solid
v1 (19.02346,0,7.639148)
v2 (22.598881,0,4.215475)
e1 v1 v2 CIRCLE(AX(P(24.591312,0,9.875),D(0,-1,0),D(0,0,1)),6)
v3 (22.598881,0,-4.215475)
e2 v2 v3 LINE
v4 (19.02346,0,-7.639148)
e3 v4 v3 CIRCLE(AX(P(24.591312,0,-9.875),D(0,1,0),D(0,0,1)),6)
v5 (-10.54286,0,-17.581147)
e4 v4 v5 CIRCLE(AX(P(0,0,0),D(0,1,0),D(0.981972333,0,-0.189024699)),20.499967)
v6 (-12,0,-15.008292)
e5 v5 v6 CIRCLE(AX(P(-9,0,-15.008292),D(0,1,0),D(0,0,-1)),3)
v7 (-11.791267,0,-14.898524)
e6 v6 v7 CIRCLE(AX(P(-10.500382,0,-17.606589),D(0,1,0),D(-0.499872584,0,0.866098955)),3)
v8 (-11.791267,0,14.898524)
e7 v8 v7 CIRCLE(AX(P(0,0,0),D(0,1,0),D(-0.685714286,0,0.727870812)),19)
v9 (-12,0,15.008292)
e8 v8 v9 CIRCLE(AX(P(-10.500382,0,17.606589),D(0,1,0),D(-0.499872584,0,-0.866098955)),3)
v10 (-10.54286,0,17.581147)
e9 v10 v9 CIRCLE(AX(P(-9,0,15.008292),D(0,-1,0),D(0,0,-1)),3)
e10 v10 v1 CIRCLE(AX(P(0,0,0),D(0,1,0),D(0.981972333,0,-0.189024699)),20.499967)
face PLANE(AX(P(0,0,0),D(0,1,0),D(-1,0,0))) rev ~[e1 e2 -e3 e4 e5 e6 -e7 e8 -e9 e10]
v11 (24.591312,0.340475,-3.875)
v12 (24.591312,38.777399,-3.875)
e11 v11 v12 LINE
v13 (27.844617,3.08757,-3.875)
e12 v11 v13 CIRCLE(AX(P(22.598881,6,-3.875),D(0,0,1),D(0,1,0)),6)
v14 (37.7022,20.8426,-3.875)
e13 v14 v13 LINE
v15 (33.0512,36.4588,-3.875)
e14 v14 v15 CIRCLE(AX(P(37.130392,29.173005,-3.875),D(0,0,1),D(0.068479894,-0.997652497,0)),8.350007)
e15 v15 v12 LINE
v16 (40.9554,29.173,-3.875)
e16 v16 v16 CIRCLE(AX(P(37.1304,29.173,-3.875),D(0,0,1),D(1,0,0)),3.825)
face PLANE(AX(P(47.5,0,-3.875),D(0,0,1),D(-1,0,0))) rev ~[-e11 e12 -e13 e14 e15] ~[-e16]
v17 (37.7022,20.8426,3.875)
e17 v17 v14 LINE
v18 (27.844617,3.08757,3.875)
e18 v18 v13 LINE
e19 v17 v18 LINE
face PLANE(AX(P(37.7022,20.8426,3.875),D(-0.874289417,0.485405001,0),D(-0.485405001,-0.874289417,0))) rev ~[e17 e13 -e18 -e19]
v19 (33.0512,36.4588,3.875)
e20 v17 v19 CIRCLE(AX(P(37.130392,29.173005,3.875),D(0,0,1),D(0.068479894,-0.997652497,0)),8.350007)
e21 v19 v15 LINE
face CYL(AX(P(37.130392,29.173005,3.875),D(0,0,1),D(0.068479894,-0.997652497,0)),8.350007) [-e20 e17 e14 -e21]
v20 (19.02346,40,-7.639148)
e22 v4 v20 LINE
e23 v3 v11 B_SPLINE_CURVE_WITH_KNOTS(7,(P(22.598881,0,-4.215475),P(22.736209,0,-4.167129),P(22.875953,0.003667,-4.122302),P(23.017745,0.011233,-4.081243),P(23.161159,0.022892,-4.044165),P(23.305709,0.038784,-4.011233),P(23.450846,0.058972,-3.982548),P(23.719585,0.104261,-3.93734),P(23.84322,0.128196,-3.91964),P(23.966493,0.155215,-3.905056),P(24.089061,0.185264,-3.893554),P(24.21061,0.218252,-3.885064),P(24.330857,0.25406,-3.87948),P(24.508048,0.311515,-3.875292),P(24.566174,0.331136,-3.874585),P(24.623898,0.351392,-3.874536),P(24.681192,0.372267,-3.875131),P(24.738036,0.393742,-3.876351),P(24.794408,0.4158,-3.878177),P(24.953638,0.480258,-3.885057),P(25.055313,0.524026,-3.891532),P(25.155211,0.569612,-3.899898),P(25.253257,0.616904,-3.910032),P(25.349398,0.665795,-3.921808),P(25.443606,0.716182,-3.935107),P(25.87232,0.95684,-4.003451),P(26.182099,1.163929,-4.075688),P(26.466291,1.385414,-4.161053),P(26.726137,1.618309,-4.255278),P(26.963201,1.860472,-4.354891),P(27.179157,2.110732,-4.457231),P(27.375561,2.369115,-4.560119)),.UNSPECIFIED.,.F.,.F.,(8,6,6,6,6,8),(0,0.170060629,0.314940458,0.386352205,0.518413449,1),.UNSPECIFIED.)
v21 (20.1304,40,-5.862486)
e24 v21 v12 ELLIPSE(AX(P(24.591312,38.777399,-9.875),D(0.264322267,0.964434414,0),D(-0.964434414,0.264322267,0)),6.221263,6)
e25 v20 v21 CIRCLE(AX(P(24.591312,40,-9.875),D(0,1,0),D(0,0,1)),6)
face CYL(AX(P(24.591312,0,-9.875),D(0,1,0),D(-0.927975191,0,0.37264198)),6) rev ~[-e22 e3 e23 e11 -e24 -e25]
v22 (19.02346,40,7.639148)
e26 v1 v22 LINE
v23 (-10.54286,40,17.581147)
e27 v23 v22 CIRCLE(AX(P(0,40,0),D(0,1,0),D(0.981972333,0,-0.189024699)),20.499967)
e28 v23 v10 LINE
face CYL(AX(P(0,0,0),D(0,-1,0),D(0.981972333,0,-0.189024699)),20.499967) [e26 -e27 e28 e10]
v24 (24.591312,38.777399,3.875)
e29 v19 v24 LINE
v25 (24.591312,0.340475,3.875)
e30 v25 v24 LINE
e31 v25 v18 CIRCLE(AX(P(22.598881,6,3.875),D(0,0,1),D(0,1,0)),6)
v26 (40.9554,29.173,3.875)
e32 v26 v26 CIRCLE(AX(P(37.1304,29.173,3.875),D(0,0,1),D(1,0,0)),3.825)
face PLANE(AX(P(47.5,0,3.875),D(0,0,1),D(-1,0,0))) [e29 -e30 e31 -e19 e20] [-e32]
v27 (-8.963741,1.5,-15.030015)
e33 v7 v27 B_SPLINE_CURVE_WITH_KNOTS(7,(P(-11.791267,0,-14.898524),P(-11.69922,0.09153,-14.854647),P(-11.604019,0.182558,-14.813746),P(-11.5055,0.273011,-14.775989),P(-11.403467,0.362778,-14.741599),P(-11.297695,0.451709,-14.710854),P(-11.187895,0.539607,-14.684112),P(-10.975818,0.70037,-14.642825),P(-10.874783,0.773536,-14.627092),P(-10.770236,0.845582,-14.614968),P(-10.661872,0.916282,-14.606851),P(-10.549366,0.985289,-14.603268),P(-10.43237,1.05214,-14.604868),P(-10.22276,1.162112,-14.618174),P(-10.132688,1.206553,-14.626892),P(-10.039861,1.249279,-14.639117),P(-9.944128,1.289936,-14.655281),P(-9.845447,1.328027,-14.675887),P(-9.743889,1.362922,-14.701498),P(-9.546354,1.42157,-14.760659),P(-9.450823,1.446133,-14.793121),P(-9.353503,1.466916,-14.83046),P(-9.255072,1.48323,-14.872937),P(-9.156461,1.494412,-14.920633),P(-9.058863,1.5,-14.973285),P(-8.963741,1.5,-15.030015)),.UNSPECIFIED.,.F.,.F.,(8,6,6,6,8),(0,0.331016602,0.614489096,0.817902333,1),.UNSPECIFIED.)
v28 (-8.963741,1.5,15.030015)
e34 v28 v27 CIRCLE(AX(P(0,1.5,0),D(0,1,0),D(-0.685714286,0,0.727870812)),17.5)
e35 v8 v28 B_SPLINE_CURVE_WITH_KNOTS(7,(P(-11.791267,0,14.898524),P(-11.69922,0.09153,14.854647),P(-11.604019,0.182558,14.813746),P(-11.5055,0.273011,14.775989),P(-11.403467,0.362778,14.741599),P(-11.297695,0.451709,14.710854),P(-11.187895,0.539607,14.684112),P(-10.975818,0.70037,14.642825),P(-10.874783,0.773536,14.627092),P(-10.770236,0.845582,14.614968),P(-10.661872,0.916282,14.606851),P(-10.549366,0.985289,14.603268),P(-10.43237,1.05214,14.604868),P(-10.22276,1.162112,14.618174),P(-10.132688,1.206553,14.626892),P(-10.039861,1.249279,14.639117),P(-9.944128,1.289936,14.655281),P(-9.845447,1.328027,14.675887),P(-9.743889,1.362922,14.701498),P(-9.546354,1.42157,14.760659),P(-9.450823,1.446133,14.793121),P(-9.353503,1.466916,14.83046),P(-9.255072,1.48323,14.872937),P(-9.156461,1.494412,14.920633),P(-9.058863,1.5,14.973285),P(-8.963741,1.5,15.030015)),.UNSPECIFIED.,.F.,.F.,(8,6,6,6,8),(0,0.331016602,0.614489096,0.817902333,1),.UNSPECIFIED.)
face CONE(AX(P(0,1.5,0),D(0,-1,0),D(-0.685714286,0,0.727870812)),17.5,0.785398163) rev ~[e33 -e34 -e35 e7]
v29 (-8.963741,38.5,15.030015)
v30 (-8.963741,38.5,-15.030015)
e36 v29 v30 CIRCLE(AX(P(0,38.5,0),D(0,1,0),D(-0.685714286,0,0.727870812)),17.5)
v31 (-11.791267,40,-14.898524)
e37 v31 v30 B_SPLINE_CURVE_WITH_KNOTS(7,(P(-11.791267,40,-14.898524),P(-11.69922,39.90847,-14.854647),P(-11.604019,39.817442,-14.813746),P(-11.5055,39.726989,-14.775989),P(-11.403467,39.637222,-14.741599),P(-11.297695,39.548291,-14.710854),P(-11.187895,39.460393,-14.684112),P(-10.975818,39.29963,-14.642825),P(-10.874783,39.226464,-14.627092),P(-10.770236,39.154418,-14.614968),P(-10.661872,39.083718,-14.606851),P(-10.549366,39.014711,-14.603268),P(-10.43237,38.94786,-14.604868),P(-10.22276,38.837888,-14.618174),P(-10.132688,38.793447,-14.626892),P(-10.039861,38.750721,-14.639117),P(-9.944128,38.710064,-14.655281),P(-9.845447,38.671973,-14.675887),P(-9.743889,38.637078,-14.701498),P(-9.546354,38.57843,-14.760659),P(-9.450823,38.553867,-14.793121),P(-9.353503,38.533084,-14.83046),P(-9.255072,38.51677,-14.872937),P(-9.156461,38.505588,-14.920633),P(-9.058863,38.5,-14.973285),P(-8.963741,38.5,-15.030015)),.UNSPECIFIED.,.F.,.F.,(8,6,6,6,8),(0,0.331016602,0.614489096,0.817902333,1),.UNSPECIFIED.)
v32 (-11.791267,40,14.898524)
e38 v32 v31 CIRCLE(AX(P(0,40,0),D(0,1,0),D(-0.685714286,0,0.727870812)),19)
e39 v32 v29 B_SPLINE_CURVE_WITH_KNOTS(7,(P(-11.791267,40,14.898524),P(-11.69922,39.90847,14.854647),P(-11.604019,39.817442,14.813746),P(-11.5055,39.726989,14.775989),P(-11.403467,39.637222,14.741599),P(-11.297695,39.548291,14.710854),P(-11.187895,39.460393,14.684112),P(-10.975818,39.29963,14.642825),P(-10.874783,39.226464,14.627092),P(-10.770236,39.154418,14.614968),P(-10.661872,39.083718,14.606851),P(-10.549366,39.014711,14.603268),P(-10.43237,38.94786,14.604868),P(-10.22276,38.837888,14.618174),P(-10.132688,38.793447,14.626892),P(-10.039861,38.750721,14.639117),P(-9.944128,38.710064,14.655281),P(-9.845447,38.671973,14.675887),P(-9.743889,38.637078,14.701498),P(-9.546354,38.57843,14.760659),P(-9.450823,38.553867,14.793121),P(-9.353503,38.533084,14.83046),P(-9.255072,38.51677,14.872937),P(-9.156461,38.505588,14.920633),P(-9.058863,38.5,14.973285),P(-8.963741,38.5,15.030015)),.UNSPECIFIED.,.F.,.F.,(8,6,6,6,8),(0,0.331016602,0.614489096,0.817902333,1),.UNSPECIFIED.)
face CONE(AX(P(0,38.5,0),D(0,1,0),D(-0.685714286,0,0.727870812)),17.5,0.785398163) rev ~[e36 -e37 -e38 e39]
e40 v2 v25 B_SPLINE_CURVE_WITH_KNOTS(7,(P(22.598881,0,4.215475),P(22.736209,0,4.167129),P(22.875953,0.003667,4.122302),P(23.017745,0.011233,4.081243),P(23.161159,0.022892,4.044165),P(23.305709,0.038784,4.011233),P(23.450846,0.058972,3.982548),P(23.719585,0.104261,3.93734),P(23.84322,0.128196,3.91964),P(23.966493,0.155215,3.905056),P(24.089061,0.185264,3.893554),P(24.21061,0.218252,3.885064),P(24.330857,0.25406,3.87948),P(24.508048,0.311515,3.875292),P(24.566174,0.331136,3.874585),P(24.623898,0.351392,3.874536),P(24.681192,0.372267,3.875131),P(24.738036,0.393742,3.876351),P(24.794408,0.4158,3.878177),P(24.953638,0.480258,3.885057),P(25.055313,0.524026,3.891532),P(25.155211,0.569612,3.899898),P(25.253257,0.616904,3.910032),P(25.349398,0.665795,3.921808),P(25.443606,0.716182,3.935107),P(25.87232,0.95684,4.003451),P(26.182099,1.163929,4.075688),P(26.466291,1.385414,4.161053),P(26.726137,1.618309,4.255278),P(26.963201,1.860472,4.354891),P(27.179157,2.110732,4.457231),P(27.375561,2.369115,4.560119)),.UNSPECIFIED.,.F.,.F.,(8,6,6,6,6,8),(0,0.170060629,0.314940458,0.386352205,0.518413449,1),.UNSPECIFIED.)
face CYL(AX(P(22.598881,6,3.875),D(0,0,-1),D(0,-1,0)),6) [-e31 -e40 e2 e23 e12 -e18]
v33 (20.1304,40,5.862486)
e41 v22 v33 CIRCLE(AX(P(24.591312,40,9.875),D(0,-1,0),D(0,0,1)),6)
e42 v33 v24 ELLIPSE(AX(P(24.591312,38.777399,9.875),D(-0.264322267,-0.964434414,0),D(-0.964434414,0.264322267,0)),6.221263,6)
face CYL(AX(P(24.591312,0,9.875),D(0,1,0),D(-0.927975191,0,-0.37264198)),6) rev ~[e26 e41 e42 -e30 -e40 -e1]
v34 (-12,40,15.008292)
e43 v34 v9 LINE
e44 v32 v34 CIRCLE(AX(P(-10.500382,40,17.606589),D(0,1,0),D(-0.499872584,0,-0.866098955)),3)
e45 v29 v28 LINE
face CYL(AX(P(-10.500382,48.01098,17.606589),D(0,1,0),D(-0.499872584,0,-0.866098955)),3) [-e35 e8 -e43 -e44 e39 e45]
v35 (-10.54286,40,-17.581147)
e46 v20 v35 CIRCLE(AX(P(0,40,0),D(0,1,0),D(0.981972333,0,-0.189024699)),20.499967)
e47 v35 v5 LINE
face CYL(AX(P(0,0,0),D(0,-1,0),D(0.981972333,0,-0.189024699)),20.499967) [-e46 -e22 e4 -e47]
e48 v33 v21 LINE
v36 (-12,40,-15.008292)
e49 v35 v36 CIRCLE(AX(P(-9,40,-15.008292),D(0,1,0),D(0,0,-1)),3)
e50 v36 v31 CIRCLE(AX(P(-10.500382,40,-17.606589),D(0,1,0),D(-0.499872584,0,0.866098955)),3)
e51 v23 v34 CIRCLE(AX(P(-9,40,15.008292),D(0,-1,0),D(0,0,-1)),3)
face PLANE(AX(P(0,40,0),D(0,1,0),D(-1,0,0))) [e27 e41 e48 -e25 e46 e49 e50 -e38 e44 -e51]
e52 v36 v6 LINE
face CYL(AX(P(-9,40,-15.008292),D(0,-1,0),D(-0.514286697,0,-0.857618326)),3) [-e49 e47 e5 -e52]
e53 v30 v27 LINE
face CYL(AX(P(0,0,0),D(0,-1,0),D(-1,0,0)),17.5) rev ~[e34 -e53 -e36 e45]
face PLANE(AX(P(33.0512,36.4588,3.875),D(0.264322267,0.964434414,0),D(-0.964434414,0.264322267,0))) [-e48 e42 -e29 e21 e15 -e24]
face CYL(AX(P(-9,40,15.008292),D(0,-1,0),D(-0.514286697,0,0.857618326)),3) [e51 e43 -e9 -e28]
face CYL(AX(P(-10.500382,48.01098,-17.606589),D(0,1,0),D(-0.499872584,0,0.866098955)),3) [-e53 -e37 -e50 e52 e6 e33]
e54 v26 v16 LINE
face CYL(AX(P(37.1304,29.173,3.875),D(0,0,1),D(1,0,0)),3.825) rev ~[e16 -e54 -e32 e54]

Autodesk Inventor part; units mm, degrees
ref_plane "XZ Plane" through (0, 0, 0) normal (0, 1, 0) x (-1, 0, 0)
ref_plane "XY Plane" through (0, 0, 0) normal (0, 0, 1) x (1, 0, 0)
sketch "Sketch1" plane through (0, 0, 0) normal (0, 1, 0) x (-1, 0, 0)
  circle A0 centre (0, 0) radius 17.5
  arc A1 (-20.1304, -3.875) -> (-20.1304, 3.875) centre (0, 0) ccw
  line L0 (-20.5, -3.875) -> (-20.5, -13.4374) construction
  line L1 (-20.5, -13.4374) -> (-20.5, 14.7091) construction
  line L2 (-47.5, 3.875) -> (-47.5, -3.875)
  line L3 (-47.5, -3.875) -> (-20.1304, -3.875)
  line L4 (0, 0) -> (-47.4736, 0) construction
  line L5 (-47.5, 3.875) -> (-20.1304, 3.875)
  dimension "d0" = 35
  dimension "d1" = 3
  dimension "d4" = 27
extrude "Extrusion1" add sketch "Sketch1" along normal blind 40
sketch "Sketch2" plane through (20.1304, 0, 3.875) normal (0, 0, 1) x (1, 0, 0)
  line L0 (27.3696, 0) -> (27.3696, 40) projected
  line L1 (2, 40) -> (27.3696, 40)
  line L2 (17.5718, 20.8426) -> (6, 0)
  line L3 (27.3696, 0) -> (0, 0) projected
  line L4 (27.3696, 0) -> (27.3696, 40) projected
  line L5 (6, 0) -> (27.3696, 0)
  line L6 (27.3696, 0) -> (27.3696, 28)
  line L7 (0, 0) -> (0, 40) projected
  arc A0 (17.5718, 20.8426) -> (12.9208, 36.4588) centre (17, 29.173) ccw
  line L8 (12.9208, 36.4588) -> (0, 40)
  circle A1 centre (17, 29.173) radius 3.825
  line L9 (0, 40) -> (27.3696, 40)
  line L10 (27.3696, 0) -> (6, 0)
  point P0 (-20.1304, 0)
  dimension "d10" = 6
  dimension "d14" = 16.7
  dimension "d15" = 17
  dimension "d16" = 7.65
extrude "Extrusion2" cut sketch "Sketch2" against normal blind 40 contours L3 L2 A0 L8 L9 L1 L0 | A1
ref_plane "Work Plane1" through (-12, 0, 0) normal (1, 0, 0) x (0, 1, 0)
split "Split1" plane through (-12, 0, 0) removes the side toward (-1, 0, 0)
chamfer "Chamfer1" distance 1.5 angle 45 1 edges at (17.5, 0, 0)
chamfer "Chamfer2" distance 1.5 angle 45 1 edges at (17.5, 40, 0)
fillet "Fillet1" radius 6 1 edges at (20.1304, 20, 3.875)
fillet "Fillet2" radius 6 1 edges at (20.1304, 20, -3.875)
fillet "Fillet3" radius 6 1 edges at (26.1304, 0, 0)
fillet "Fillet4" radius 3 2 edges at (-12, 20, -16.6208) (-12, 20, 16.6208)
fillet_without_effect "Fillet5"
fillet "Fillet6" radius 3 2 edges at (-12, 20, -12.7377) (-12, 20, 12.7377)
properties part number "Radio Mic Holder"
